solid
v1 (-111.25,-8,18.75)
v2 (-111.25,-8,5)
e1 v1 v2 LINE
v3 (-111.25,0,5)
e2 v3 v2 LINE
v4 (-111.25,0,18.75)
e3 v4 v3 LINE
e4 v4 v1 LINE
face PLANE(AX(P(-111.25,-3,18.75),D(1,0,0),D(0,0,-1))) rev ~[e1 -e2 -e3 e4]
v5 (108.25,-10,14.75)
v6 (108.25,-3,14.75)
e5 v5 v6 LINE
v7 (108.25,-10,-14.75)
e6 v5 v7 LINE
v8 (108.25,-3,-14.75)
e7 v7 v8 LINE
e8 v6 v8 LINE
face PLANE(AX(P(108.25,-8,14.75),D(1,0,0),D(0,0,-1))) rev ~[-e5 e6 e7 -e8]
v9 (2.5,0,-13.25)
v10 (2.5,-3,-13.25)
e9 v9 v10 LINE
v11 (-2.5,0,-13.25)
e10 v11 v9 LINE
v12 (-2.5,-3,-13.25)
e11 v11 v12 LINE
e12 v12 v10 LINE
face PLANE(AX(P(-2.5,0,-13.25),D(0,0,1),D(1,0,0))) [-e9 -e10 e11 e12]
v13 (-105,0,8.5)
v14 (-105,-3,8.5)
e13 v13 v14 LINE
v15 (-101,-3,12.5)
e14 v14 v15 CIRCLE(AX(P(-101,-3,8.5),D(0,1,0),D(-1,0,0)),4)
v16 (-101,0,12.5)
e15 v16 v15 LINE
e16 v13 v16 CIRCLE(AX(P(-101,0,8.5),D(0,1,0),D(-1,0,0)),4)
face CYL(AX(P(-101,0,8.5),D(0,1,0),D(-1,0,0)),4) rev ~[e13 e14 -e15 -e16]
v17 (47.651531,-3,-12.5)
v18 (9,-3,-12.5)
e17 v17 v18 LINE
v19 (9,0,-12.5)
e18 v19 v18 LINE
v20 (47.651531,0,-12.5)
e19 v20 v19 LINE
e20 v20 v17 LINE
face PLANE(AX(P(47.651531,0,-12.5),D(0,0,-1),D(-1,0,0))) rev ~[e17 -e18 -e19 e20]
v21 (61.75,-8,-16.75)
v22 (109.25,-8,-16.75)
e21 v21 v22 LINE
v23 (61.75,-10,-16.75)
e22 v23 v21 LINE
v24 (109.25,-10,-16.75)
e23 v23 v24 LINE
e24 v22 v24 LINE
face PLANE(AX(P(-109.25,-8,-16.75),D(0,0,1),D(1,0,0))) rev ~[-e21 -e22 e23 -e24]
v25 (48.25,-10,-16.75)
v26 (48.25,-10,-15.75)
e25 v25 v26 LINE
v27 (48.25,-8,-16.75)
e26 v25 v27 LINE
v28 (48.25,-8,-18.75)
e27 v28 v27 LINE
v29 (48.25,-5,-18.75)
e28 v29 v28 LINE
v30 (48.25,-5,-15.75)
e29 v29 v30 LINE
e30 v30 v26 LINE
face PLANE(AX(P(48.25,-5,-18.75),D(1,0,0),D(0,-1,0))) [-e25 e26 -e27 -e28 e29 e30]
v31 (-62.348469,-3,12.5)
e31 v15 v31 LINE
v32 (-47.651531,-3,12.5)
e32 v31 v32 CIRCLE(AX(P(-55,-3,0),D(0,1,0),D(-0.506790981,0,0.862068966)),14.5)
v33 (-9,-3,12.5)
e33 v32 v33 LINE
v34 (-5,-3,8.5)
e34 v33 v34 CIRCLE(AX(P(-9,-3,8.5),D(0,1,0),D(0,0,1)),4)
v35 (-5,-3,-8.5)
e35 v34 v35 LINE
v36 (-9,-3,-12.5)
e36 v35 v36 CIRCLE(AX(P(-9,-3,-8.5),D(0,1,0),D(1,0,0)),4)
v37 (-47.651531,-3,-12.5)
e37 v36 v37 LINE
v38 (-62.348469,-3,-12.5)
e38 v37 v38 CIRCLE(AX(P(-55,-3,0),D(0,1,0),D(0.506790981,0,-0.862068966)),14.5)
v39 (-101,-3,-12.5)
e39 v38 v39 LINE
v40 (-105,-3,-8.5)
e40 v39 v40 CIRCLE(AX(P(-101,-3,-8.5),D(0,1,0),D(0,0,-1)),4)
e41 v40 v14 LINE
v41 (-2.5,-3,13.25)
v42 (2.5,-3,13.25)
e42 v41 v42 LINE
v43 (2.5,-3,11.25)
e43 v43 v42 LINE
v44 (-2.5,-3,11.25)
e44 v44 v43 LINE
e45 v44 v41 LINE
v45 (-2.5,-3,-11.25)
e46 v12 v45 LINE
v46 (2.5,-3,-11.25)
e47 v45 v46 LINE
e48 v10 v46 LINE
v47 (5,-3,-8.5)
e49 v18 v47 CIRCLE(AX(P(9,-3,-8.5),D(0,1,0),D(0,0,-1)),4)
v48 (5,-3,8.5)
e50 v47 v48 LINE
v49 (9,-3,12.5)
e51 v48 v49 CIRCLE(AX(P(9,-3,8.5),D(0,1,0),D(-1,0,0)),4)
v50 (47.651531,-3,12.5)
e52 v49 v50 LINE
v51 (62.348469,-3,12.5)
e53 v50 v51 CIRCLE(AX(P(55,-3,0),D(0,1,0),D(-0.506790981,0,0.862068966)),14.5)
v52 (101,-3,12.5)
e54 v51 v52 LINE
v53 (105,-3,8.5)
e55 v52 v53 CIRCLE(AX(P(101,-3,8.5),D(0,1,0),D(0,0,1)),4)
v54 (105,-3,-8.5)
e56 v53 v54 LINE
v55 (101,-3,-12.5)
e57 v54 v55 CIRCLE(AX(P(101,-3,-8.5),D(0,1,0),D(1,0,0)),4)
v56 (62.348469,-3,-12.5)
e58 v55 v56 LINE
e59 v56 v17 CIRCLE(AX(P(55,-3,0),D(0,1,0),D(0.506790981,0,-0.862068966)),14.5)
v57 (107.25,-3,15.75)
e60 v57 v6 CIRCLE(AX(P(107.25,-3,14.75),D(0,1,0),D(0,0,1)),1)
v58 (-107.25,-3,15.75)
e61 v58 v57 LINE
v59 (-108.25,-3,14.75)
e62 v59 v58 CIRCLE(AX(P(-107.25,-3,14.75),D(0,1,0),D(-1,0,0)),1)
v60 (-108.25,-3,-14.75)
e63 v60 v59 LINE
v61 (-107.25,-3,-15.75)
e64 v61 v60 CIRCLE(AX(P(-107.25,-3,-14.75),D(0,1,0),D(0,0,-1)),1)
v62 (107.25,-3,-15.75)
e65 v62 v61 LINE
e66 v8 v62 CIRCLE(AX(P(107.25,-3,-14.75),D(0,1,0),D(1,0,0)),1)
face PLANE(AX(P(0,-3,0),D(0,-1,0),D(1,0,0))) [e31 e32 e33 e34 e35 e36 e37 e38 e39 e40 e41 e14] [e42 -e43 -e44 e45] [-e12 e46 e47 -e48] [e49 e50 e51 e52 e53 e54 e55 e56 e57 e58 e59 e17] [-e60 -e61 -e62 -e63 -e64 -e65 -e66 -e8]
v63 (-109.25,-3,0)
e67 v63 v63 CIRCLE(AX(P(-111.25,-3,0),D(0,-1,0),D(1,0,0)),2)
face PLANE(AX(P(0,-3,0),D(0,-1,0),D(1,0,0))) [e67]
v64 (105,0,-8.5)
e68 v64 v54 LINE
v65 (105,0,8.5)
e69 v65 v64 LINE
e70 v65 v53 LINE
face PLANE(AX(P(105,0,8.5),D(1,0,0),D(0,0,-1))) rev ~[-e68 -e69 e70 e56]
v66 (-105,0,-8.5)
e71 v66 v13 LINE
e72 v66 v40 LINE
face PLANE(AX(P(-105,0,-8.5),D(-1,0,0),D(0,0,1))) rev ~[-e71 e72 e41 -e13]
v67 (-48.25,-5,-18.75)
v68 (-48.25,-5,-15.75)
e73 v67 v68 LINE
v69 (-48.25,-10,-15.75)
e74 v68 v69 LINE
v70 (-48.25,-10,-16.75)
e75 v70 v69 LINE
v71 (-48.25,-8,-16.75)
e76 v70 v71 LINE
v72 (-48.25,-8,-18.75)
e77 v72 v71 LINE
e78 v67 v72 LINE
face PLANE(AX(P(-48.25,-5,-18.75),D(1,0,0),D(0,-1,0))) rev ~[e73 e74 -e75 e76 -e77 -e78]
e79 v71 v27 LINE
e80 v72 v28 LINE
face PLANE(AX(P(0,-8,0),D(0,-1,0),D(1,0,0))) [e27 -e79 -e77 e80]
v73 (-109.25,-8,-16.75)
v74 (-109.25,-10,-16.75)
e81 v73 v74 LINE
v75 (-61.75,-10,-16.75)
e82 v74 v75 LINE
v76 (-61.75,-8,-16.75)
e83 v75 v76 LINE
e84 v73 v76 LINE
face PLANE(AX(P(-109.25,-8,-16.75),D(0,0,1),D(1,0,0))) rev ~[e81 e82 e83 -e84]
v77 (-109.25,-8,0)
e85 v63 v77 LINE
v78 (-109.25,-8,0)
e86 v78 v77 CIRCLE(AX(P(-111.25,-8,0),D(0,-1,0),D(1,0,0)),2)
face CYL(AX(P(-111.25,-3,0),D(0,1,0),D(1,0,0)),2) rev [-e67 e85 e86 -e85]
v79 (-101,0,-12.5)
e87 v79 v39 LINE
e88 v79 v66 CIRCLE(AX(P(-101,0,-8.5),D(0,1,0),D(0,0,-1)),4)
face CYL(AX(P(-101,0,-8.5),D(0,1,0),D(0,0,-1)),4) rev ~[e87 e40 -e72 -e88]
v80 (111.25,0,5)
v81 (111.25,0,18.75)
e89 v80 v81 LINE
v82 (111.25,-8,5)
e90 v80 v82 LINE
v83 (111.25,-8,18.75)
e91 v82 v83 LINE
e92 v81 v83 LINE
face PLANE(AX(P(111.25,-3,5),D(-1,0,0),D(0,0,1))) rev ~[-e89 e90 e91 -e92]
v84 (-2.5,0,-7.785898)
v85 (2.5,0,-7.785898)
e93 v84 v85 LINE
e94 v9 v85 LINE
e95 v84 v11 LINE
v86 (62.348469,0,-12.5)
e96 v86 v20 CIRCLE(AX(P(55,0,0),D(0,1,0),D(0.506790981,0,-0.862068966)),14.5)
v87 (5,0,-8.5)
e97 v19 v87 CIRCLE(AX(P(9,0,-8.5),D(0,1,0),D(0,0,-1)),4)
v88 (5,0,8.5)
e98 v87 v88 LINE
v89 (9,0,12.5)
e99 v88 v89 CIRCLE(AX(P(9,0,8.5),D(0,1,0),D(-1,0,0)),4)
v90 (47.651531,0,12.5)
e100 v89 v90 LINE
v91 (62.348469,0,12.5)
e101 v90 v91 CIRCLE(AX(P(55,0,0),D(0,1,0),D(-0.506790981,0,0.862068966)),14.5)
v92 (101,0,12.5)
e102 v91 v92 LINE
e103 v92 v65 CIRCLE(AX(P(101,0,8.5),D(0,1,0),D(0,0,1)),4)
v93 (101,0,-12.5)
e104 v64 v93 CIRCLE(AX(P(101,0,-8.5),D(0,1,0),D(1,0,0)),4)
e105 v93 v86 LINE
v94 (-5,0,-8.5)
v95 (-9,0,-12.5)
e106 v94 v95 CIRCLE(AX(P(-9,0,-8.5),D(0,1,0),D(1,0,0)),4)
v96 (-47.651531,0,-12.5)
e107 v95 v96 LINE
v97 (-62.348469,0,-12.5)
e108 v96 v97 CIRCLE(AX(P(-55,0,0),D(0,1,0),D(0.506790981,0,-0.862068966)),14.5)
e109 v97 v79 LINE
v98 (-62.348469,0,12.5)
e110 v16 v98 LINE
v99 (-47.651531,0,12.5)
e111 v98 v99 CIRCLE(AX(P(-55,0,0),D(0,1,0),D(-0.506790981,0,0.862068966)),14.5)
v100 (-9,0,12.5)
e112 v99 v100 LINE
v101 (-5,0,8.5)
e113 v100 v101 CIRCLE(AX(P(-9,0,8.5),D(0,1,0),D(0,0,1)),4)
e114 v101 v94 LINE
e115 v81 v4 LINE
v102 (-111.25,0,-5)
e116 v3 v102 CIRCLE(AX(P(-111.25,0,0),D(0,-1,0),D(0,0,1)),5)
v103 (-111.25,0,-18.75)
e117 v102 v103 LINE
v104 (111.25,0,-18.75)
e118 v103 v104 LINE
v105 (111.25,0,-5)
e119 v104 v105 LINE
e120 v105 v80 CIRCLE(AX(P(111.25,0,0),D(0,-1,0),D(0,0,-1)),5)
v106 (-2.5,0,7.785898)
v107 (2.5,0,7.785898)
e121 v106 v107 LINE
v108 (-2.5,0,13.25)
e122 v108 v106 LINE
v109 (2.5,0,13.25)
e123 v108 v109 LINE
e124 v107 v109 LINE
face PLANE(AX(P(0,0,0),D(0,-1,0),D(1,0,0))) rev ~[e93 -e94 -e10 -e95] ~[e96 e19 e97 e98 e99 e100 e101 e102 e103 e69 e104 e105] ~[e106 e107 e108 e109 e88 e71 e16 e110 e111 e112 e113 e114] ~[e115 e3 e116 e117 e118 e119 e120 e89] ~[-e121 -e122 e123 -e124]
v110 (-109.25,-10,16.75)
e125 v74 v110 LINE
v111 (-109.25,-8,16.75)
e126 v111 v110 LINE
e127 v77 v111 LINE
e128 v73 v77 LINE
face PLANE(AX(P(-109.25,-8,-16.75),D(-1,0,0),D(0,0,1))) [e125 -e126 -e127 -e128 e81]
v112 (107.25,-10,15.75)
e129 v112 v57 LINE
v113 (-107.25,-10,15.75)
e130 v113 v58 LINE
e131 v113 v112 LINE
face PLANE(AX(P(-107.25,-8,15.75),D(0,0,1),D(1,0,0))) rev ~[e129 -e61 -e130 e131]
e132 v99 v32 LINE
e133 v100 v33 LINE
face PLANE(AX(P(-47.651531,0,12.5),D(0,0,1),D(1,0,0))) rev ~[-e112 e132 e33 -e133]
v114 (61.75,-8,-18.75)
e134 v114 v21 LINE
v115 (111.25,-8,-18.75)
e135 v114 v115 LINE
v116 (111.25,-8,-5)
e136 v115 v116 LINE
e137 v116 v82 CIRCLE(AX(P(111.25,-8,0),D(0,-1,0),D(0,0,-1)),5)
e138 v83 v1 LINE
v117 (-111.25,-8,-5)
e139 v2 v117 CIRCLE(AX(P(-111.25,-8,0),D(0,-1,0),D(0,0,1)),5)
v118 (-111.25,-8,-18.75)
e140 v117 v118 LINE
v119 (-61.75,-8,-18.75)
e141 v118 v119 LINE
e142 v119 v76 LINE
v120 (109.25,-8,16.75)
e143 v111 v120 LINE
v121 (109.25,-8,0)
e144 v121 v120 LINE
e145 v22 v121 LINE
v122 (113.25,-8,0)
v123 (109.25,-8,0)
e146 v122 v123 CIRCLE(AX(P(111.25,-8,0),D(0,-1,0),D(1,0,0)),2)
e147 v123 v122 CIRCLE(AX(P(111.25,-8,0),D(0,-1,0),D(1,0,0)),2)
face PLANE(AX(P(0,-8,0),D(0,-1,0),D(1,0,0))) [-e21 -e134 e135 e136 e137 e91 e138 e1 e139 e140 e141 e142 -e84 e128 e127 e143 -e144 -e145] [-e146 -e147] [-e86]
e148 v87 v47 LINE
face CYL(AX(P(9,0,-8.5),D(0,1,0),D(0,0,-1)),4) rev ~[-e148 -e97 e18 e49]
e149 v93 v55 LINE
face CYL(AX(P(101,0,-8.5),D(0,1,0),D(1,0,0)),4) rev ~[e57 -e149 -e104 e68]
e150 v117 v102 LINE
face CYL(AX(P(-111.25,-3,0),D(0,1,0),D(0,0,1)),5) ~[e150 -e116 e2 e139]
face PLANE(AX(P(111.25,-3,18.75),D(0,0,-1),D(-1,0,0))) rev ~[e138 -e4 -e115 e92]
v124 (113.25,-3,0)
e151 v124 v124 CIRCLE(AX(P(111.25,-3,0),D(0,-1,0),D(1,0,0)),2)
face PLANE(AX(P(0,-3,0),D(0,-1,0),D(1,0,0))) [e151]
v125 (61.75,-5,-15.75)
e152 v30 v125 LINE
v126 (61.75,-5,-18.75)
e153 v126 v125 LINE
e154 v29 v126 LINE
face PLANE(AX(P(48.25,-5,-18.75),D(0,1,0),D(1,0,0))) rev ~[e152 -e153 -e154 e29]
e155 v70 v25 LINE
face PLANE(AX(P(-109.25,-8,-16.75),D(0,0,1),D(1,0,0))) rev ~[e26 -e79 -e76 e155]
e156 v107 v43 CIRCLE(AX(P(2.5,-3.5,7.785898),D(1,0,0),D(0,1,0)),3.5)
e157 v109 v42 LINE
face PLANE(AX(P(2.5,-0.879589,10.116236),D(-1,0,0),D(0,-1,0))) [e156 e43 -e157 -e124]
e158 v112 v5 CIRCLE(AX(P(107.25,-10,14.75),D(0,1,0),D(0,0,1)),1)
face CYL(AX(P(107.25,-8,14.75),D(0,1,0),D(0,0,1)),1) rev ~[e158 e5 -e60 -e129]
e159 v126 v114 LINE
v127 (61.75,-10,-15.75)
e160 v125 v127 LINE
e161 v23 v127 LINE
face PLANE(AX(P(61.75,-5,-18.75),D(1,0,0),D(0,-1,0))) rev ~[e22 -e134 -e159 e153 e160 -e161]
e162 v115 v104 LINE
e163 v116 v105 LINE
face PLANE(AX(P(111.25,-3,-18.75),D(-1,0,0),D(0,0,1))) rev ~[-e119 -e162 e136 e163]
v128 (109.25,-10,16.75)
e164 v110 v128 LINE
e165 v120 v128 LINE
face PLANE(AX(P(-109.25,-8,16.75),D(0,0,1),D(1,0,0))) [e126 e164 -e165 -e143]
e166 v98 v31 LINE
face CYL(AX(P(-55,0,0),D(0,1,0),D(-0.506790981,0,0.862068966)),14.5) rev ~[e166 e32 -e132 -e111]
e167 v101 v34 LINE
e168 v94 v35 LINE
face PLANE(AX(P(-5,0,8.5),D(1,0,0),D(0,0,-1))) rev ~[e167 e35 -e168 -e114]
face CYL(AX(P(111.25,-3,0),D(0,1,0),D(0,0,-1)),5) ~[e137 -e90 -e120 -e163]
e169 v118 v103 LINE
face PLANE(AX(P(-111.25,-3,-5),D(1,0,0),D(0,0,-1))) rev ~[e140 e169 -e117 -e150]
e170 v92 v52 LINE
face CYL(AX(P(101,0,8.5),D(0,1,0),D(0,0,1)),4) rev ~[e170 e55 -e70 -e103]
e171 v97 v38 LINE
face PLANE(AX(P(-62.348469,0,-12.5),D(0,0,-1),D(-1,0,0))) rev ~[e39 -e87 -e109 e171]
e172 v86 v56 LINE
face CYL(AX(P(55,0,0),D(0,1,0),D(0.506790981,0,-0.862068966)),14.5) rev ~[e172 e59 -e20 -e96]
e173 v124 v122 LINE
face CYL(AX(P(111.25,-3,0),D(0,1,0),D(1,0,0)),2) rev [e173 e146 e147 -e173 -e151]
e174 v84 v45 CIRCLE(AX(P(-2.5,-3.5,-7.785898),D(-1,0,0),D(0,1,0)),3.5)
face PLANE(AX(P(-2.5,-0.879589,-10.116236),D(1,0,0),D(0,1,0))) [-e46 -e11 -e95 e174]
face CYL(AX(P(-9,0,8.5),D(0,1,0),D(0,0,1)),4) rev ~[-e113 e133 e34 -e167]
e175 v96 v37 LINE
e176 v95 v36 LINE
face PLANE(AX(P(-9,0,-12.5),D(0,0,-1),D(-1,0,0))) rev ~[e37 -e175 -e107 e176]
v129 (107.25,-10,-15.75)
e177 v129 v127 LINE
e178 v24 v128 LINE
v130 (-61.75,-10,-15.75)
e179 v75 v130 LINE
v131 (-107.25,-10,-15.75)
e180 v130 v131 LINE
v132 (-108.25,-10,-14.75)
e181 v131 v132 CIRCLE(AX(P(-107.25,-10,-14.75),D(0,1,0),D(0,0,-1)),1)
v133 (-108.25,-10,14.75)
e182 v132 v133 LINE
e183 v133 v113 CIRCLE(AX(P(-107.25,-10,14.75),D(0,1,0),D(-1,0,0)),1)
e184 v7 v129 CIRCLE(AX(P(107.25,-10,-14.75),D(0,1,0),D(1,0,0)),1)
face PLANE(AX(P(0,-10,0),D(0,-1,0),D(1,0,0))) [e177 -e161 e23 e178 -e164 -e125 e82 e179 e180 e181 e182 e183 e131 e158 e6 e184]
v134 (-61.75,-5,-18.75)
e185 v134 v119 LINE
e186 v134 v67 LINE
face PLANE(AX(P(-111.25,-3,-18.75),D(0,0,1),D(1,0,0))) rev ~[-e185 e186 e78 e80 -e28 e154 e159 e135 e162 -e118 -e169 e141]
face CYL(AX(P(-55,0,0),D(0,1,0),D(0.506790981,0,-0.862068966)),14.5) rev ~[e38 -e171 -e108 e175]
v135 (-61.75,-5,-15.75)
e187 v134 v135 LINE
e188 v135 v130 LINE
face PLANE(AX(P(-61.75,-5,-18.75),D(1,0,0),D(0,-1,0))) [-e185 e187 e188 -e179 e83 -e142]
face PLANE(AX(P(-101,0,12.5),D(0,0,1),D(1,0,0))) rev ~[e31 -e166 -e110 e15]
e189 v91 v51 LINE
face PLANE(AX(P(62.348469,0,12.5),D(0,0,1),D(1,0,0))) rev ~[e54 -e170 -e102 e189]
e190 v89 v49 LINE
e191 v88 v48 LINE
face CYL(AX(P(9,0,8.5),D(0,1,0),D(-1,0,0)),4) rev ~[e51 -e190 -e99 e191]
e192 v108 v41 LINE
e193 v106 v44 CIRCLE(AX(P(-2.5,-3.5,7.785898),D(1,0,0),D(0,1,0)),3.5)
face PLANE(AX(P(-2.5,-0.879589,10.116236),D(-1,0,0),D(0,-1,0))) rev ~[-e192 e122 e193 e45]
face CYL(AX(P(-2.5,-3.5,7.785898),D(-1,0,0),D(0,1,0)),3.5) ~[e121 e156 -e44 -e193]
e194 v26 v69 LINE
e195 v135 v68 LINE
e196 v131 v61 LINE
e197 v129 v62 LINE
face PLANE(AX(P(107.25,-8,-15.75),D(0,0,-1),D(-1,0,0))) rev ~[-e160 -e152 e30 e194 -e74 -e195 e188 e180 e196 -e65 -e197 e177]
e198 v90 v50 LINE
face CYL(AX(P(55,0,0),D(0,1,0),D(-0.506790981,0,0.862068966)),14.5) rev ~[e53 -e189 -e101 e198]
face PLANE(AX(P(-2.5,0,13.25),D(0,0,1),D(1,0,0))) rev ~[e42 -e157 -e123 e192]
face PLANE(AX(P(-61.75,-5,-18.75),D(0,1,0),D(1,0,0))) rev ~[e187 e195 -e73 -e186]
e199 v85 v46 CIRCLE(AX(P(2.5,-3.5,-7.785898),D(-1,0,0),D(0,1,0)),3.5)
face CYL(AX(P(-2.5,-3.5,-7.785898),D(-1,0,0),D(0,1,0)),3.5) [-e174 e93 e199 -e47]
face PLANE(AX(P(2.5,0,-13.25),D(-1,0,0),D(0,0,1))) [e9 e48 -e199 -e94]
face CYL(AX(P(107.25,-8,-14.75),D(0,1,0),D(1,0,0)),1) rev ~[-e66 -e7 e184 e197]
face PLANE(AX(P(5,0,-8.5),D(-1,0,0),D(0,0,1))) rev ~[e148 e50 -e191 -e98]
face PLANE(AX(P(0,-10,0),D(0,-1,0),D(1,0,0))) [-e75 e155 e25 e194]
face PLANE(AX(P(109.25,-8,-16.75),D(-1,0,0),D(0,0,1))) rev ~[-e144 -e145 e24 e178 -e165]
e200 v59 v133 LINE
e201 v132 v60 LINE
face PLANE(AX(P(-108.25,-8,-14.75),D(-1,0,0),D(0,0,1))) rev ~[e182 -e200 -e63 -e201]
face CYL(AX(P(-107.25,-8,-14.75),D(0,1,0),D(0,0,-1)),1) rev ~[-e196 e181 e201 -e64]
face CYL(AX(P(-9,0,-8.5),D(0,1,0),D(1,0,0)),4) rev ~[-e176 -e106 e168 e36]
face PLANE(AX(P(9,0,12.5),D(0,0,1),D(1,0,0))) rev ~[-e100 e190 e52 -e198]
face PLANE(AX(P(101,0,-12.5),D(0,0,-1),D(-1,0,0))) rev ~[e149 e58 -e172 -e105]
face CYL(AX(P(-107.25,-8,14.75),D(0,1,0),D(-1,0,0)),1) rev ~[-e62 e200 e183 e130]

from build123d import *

# Parameters (mm, degrees)
F0_W        = 5
F0_H        = 2
F1_DEPTH    = 3
F2_R        = 2
F3_DEPTH    = 5
F4_W        = 218.5
F4_H        = 33.5
F5_DEPTH    = 2
F6_W        = 13.5
F6_H        = 5
F7_DEPTH    = 25
F8_T1_DEPTH = 5


# Not quite as in the source:
# - a fillet or chamfer that OpenCascade refuses, or shapes differently, is made with other operations: its cross-section is extruded or revolved along the edge and cut away or added
# - a feature names something its author has since deleted; it is built from what else it names


with BuildPart() as f1:
    # F0 (on Front) → F1 (new body)
    with BuildSketch(Plane.XZ):
        Polygon((111.25, 5), (111.25, 18.75), (-111.25, 18.75), (-111.25, 5), (-111.25, -5), (-111.25, -18.75), (111.25, -18.75), (111.25, -5), align=None)
        with Locations((0, -12.25)):
            Rectangle(F0_W, F0_H, mode=Mode.SUBTRACT)
        with BuildLine():
            Line((-47.6515307717, 12.5), (-9, 12.5))
            ThreePointArc((-9, 12.5), (-6.1715728753, 11.3284271247), (-5, 8.5))
            Line((-5, 8.5), (-5, -8.5))
            ThreePointArc((-5, -8.5), (-6.1715728753, -11.3284271247), (-9, -12.5))
            Line((-9, -12.5), (-47.6515307717, -12.5))
            ThreePointArc((-47.6515307717, -12.5), (-55, -14.5), (-62.3484692283, -12.5))
            Line((-62.3484692284, -12.5), (-101, -12.5))
            ThreePointArc((-101, -12.5), (-103.8284271247, -11.3284271247), (-105, -8.5))
            Line((-105, -8.5), (-105, 8.5))
            ThreePointArc((-105, 8.5), (-103.8284271247, 11.3284271247), (-101, 12.5))
            Line((-101, 12.5), (-62.3484692284, 12.5))
            ThreePointArc((-62.3484692283, 12.5), (-55, 14.5), (-47.6515307717, 12.5))
        make_face(mode=Mode.SUBTRACT)
        with BuildLine():
            Line((62.3484692283, 12.5), (101, 12.5))
            ThreePointArc((101, 12.5), (103.8284271247, 11.3284271247), (105, 8.5))
            Line((105, 8.5), (105, -8.5))
            ThreePointArc((105, -8.5), (103.8284271247, -11.3284271247), (101, -12.5))
            Line((101, -12.5), (62.3484692283, -12.5))
            ThreePointArc((62.3484692283, -12.5), (55, -14.5), (47.6515307717, -12.5))
            Line((47.6515307716, -12.5), (9, -12.5))
            ThreePointArc((9, -12.5), (6.1715728753, -11.3284271247), (5, -8.5))
            Line((5, -8.5), (5, 8.5))
            ThreePointArc((5, 8.5), (6.1715728753, 11.3284271247), (9, 12.5))
            Line((9, 12.5), (47.6515307716, 12.5))
            ThreePointArc((47.6515307717, 12.5), (55, 14.5), (62.3484692283, 12.5))
        make_face(mode=Mode.SUBTRACT)
        with Locations((0, 12.25)):
            Rectangle(F0_W, F0_H, mode=Mode.SUBTRACT)
        with BuildLine():
            ThreePointArc((111.25, -5), (116.25, 0), (111.25, 5))
            Line((111.25, 5), (111.25, -5))
        make_face()
        with BuildLine():
            Line((-111.25, -5), (-111.25, 5))
            ThreePointArc((-111.25, 5), (-116.25, 0), (-111.25, -5))
        make_face()
    extrude(amount=F1_DEPTH)

    # F2 (on face) → F3 (join)
    with BuildSketch(Plane.XZ.offset(3)):
        with BuildLine():
            ThreePointArc((111.25, -5), (116.25, 0), (111.25, 5))
            Line((111.25, 5), (111.25, 18.75))
            Line((111.25, 18.75), (-111.25, 18.75))
            Line((-111.25, 18.75), (-111.25, 5))
            ThreePointArc((-111.25, 5), (-116.25, 0), (-111.25, -5))
            Line((-111.25, -5), (-111.25, -18.75))
            Line((-111.25, -18.75), (111.25, -18.75))
            Line((111.25, -18.75), (111.25, -5))
        make_face()
        with Locations((-111.25, 0)):
            Circle(F2_R, mode=Mode.SUBTRACT)
        with BuildLine():
            Line((-107.25, 15.75), (107.25, 15.75))
            ThreePointArc((107.25, 15.75), (107.9571067812, 15.4571067812), (108.25, 14.75))
            Line((108.25, 14.75), (108.25, -14.75))
            ThreePointArc((108.25, -14.75), (107.9571067812, -15.4571067812), (107.25, -15.75))
            Line((107.25, -15.75), (-107.25, -15.75))
            ThreePointArc((-107.25, -15.75), (-107.9571067812, -15.4571067812), (-108.25, -14.75))
            Line((-108.25, -14.75), (-108.25, 14.75))
            ThreePointArc((-108.25, 14.75), (-107.9571067812, 15.4571067812), (-107.25, 15.75))
        make_face(mode=Mode.SUBTRACT)
        with Locations((111.25, 0)):
            Circle(F2_R, mode=Mode.SUBTRACT)
    extrude(amount=F3_DEPTH)

    # F4 (on face) → F5 (join)
    with BuildSketch(Plane.XZ.offset(8)):
        Rectangle(F4_W, F4_H)
        with BuildLine():
            ThreePointArc((-108.25, 14.75), (-107.9571067812, 15.4571067812), (-107.25, 15.75))
            Line((-107.25, 15.75), (107.25, 15.75))
            ThreePointArc((107.25, 15.75), (107.9571067812, 15.4571067812), (108.25, 14.75))
            Line((108.25, 14.75), (108.25, -14.75))
            ThreePointArc((108.25, -14.75), (107.9571067812, -15.4571067812), (107.25, -15.75))
            Line((107.25, -15.75), (-107.25, -15.75))
            ThreePointArc((-107.25, -15.75), (-107.9571067812, -15.4571067812), (-108.25, -14.75))
            Line((-108.25, -14.75), (-108.25, 14.75))
        make_face(mode=Mode.SUBTRACT)
    extrude(amount=F5_DEPTH)

    # F6 (on face) → F7 (cut)
    with BuildSketch(Plane(origin=(0, 0, -18.75), x_dir=(1, 0, 0), z_dir=(0, 0, -1))):
        with Locations((-55, 7.5)):
            Rectangle(F6_W, F6_H)
        with Locations((55, 7.5)):
            Rectangle(F6_W, F6_H)
    extrude(amount=-F7_DEPTH, mode=Mode.SUBTRACT)

    # F8: fillet of radius 3.5 on 2 edges, made by hand

    # F8_s2 → F8_t1 (cut)
    with BuildSketch(Plane.YZ.offset(-2.5)):
        with BuildLine():
            ThreePointArc((0, 7.7858983849), (-0.8542486889, 10.0771862323), (-3, 11.25))
            Line((-3, 11.25), (0, 11.25))
            Line((0, 11.25), (0, 7.7858983849))
        make_face()
        with BuildLine():
            ThreePointArc((0, -7.7858983849), (-0.8542486889, -10.0771862323), (-3, -11.25))
            Line((-3, -11.25), (0, -11.25))
            Line((0, -11.25), (0, -7.7858983849))
        make_face()
    extrude(amount=F8_T1_DEPTH, mode=Mode.SUBTRACT)


solid = f1.part
